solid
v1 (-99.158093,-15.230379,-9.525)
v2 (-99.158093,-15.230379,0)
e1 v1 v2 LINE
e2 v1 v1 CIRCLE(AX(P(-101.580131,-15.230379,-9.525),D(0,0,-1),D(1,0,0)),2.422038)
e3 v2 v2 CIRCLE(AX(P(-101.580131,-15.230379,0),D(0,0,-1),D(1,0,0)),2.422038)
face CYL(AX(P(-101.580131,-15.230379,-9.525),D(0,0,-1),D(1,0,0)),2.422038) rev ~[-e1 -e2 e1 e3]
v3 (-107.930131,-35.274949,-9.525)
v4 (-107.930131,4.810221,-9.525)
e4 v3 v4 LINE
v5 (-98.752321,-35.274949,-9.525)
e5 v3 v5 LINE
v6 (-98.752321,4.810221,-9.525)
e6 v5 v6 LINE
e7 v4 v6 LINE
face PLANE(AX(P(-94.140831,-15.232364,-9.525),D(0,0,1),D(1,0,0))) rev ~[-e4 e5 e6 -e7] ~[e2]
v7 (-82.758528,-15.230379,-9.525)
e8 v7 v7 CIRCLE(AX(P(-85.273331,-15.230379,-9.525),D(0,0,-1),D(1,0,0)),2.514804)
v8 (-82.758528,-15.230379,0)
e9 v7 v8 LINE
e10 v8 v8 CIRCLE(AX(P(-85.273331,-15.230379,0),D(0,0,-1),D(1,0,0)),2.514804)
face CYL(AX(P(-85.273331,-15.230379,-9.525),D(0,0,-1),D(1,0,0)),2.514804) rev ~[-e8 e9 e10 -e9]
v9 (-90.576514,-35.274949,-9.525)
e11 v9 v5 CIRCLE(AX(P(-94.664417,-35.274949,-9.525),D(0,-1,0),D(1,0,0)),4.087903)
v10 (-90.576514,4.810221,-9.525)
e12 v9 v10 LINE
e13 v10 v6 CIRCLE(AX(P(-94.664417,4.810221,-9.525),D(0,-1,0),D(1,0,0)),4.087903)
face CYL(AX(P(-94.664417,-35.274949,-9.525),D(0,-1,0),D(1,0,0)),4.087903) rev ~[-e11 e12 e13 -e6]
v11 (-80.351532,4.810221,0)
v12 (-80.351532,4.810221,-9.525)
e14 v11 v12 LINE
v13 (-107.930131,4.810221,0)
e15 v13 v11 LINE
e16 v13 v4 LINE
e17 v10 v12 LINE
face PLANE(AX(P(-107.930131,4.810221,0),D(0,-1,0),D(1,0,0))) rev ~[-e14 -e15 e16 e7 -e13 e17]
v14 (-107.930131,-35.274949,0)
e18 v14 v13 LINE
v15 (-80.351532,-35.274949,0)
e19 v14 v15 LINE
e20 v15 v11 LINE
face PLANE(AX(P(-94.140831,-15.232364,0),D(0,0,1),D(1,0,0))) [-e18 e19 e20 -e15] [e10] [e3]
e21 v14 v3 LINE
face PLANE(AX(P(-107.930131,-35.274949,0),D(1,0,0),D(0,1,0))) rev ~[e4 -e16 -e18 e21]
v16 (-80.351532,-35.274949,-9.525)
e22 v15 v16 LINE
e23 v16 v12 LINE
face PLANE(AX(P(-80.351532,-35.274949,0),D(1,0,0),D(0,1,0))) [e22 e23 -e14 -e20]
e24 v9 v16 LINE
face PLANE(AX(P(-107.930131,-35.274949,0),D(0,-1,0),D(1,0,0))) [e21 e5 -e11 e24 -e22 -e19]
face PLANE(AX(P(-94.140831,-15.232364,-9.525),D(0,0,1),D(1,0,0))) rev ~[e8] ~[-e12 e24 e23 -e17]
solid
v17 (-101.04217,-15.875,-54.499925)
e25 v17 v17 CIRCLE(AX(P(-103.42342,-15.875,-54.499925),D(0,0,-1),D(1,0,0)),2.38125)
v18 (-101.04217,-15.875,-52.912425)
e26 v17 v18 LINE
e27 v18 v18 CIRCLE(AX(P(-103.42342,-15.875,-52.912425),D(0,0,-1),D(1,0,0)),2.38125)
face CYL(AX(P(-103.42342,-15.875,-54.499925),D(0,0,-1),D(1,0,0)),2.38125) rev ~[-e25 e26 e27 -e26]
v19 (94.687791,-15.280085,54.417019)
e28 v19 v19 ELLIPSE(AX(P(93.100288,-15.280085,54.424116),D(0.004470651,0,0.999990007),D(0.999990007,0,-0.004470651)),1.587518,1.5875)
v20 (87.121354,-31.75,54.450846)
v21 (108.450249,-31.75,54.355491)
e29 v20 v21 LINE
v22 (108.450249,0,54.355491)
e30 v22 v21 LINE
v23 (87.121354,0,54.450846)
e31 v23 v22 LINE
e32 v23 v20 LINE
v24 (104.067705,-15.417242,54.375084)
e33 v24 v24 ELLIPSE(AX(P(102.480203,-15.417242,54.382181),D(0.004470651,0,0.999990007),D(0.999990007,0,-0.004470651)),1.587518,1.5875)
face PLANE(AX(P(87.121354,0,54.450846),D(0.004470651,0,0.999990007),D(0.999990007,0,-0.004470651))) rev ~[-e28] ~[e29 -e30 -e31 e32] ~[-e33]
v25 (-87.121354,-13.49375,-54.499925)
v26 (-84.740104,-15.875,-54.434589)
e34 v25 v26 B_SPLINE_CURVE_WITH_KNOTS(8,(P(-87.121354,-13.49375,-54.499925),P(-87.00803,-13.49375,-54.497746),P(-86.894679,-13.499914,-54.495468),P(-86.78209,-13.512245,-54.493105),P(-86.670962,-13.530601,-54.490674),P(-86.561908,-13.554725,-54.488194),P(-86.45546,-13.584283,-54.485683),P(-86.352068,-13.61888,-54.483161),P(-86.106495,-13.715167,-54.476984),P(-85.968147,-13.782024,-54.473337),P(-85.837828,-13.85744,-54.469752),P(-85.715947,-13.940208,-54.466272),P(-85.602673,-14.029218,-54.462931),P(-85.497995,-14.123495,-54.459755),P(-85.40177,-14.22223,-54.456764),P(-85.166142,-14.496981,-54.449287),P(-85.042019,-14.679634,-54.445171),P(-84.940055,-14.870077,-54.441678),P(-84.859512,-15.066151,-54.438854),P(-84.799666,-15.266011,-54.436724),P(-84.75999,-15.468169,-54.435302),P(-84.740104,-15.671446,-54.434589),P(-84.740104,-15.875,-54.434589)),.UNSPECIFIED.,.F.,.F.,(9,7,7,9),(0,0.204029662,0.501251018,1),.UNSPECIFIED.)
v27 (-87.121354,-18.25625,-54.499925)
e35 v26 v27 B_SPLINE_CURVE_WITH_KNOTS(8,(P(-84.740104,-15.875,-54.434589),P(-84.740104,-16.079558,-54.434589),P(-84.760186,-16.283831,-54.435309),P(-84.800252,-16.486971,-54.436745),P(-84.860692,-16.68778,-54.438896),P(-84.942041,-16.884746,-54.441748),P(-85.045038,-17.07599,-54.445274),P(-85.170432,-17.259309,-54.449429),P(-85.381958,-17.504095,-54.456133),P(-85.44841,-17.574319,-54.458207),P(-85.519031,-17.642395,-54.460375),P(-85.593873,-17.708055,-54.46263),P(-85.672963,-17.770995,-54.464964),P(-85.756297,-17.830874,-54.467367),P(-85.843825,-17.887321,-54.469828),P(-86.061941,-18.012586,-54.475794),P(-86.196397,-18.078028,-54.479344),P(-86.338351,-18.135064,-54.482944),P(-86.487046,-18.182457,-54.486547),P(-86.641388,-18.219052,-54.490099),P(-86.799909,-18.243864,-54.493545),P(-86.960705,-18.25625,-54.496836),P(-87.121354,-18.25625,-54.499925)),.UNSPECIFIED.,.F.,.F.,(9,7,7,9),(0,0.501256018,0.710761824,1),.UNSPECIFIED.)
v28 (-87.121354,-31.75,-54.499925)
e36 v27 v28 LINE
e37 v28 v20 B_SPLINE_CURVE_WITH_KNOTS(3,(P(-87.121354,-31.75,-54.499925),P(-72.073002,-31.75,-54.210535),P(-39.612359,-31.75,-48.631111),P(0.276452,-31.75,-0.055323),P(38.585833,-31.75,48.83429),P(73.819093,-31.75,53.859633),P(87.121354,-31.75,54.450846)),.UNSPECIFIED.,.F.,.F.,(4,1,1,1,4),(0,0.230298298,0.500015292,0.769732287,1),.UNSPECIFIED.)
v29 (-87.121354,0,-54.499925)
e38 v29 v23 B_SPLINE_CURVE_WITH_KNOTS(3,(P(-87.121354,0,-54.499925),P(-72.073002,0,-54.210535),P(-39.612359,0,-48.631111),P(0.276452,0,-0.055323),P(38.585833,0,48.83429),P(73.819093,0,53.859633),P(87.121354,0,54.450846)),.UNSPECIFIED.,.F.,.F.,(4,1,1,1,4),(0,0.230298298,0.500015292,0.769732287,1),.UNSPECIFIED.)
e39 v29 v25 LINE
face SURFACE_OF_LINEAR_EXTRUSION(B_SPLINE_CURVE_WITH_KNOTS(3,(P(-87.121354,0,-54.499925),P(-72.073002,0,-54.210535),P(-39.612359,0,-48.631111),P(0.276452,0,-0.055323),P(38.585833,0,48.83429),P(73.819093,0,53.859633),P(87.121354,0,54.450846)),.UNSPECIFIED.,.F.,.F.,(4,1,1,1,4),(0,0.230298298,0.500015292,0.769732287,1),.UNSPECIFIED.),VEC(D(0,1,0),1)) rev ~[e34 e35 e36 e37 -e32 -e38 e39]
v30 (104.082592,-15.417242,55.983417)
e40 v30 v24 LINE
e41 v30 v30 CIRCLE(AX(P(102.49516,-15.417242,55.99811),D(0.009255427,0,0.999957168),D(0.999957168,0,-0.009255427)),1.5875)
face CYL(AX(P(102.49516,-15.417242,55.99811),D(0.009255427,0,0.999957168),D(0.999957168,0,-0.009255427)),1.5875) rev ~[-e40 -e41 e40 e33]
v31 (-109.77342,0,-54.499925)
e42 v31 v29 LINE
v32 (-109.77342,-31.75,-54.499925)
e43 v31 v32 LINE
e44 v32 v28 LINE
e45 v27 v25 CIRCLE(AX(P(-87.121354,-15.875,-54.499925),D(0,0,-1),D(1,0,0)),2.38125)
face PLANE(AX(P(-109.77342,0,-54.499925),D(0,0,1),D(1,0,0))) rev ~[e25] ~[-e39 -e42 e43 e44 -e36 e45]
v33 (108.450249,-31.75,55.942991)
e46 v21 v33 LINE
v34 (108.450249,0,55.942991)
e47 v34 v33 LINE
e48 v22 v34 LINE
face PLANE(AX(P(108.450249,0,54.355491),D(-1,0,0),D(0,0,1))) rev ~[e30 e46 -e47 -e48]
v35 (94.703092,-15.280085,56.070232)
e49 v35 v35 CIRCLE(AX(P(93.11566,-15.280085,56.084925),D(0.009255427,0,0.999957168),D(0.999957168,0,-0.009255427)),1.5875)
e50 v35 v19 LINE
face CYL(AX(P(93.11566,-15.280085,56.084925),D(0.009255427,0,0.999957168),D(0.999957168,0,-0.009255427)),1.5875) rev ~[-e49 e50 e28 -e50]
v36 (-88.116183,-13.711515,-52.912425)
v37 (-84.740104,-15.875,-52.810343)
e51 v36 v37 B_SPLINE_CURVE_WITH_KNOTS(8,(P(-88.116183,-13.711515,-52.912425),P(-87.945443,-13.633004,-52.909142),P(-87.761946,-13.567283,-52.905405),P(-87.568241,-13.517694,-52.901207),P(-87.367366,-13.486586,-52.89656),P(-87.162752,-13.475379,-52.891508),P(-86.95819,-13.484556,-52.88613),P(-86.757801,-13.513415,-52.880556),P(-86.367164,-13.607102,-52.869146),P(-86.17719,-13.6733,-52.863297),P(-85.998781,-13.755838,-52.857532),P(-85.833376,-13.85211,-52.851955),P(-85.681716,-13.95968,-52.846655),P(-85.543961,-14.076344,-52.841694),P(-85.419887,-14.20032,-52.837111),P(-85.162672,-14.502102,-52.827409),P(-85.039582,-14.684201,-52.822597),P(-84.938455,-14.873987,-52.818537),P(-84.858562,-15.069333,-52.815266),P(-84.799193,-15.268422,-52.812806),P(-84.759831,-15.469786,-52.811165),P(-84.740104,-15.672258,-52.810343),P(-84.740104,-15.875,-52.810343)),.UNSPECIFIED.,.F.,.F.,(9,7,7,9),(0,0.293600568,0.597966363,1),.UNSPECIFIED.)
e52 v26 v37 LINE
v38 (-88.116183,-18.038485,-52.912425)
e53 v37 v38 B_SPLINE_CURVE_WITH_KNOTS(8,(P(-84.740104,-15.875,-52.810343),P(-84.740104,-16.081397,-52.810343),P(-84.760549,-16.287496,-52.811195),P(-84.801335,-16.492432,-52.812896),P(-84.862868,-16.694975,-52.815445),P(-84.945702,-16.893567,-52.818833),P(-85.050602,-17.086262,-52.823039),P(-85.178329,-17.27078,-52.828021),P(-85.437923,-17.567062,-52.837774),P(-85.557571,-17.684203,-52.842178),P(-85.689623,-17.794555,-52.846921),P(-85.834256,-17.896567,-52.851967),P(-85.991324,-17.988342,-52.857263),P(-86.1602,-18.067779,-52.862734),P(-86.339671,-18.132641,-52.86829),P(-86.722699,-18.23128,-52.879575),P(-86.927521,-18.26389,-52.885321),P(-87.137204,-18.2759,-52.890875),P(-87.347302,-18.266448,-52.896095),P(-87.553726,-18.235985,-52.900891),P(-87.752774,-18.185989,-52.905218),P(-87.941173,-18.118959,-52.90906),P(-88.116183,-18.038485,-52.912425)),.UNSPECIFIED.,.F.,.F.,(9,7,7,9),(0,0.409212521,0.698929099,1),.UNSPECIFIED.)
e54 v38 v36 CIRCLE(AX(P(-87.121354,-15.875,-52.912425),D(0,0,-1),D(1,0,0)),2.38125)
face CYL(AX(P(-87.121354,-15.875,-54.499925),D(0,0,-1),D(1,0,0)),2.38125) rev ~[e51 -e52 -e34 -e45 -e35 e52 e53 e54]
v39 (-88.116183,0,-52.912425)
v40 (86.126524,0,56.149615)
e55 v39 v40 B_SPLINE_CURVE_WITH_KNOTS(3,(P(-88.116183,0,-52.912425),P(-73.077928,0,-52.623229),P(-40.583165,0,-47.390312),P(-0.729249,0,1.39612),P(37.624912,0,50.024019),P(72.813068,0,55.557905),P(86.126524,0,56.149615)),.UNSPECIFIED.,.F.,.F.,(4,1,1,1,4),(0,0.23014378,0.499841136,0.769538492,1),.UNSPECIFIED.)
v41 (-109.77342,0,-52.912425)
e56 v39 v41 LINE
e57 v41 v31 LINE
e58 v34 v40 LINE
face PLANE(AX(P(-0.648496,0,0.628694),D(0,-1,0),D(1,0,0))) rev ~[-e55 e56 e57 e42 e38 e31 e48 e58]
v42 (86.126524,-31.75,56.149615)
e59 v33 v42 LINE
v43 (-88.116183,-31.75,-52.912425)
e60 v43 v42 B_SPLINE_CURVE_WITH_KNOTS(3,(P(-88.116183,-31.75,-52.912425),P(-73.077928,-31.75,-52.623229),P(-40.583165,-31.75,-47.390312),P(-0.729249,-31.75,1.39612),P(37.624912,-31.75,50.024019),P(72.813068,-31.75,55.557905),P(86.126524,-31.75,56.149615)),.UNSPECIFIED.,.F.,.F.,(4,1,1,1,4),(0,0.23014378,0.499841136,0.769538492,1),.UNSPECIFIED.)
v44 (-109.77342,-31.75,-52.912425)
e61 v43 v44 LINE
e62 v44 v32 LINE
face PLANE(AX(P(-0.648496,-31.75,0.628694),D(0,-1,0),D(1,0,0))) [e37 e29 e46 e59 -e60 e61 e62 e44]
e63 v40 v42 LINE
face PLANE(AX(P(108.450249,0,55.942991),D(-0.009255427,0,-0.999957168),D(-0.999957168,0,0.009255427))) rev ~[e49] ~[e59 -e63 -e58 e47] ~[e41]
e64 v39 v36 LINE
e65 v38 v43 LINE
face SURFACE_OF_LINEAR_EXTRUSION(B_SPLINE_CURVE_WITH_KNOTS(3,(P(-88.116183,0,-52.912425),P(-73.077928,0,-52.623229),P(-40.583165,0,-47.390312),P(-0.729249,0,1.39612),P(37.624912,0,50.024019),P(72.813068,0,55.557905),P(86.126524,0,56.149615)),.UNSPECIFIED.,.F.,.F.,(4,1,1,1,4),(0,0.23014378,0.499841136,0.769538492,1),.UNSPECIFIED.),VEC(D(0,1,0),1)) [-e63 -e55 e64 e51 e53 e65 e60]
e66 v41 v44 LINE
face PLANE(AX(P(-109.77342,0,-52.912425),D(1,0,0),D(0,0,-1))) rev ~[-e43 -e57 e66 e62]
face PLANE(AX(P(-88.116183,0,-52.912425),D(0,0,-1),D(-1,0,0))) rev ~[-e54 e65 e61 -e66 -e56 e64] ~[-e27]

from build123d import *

# Parameters (mm, degrees)
F2_DEPTH  = 31.75
F3_R      = 1.5875
F4_DEPTH  = 2.54
F5_R      = 2.38125
F6_DEPTH  = 2.54
F7_W      = 27.578599751
F7_H      = 40.0851694867
F8_DEPTH  = 9.525
F9_R      = 2.4220384901
F9_R_2    = 2.5148035407
F10_DEPTH = 25.4
F12_DEPTH = 50.8


# Not quite as in the source:
# - the program builds the solid bodies; features that only make, move or delete a surface that nothing else refers to are left out


with BuildPart() as f2:
    # F0 (on Front) → F2 (new body)
    with BuildSketch(Plane.XZ):
        with BuildLine():
            Line((-109.7734197974, -54.4999252498), (-87.1213535286, -54.4999252498))
            add(Edge.make_bspline(
                [(-87.1213535286, -54.4999252498), (-72.0730019908, -54.2105347145), (-39.612358699, -48.6311111585), (0.2764524513, -0.055323172), (38.5858327695, 48.8342903772), (73.8190934908, 53.859632643), (87.1213535286, 54.4508459553)],
                knots=[0, 0, 0, 0, 0.230298298, 0.5000152925, 0.7697322871, 1, 1, 1, 1], degree=3))
            Line((87.1213535286, 54.4508459553), (108.4502488375, 54.3554909527))
            Line((108.4502488375, 54.3554909527), (108.4502488375, 55.9429909527))
            Line((108.4502488375, 55.9429909527), (86.1265237905, 56.1496154059))
            add(Edge.make_bspline(
                [(-88.1161832666, -52.9124252498), (-73.0779283777, -52.6232288803), (-40.5831653258, -47.3903123555), (-0.7292490562, 1.3961196705), (37.624911948, 50.0240186994), (72.8130684815, 55.5579045244), (86.1265237905, 56.1496154059)],
                knots=[0, 0, 0, 0, 0.23014378, 0.4998411361, 0.7695384922, 1, 1, 1, 1], degree=3))
            Line((-88.1161832666, -52.9124252498), (-109.7734197974, -52.9124252498))
            Line((-109.7734197974, -52.9124252498), (-109.7734197974, -54.4999252498))
        make_face()
    extrude(amount=F2_DEPTH)

    # F3 (on face) → F4 (cut)
    with BuildSketch(Plane(origin=(0.5270442453, 0, 56.9419090581), x_dir=(0.9999571676, 0, -0.0092554268), z_dir=(0.0092554268, 0, 0.9999571676))):
        with Locations((92.5925821066, -15.2800846845)):
            Circle(F3_R)
        with Locations((101.9724830985, -15.4172424227)):
            Circle(F3_R)
    extrude(amount=-F4_DEPTH, mode=Mode.SUBTRACT)

    # F5 (on face) → F6 (cut)
    with BuildSketch(Plane(origin=(0, 0, -54.4999252498), x_dir=(1, 0, 0), z_dir=(0, 0, -1))):
        with Locations((-103.4234197974, 15.875)):
            Circle(F5_R)
        with Locations((-87.1213535286, 15.875)):
            Circle(F5_R)
    extrude(amount=-F6_DEPTH, mode=Mode.SUBTRACT)


with BuildPart() as f8:
    # F7 (on Top) → F8 (new body)
    with BuildSketch(Plane.XY):
        with Locations((-94.1408313811, -15.2323641814)):
            Rectangle(F7_W, F7_H)
    extrude(amount=-F8_DEPTH)

    # F9 (on face) → F10 (cut)
    with BuildSketch(Plane(origin=(0, 0, -9.525), x_dir=(1, 0, 0), z_dir=(0, 0, -1))):
        with Locations((-101.5801312566, 15.2303794381)):
            Circle(F9_R)
        with Locations((-85.2733312566, 15.2303794381)):
            Circle(F9_R_2)
    extrude(amount=-F10_DEPTH, mode=Mode.SUBTRACT)

    # F11 (on face) → F12 (cut)
    with BuildSketch(Plane.XZ.offset(35.2749489248)):
        with BuildLine():
            Line((-98.7523206457, -9.525), (-90.5765137688, -9.525))
            ThreePointArc((-90.5765137688, -9.525), (-94.6644172072, -5.4370965615), (-98.7523206457, -9.525))
        make_face()
        with BuildLine():
            ThreePointArc((-98.7523206457, -9.525), (-94.6644172072, -13.6129034385), (-90.5765137688, -9.525))
            Line((-90.5765137688, -9.525), (-98.7523206457, -9.525))
        make_face()
    extrude(amount=-F12_DEPTH, mode=Mode.SUBTRACT)


solid = Compound([f2.part, f8.part])
